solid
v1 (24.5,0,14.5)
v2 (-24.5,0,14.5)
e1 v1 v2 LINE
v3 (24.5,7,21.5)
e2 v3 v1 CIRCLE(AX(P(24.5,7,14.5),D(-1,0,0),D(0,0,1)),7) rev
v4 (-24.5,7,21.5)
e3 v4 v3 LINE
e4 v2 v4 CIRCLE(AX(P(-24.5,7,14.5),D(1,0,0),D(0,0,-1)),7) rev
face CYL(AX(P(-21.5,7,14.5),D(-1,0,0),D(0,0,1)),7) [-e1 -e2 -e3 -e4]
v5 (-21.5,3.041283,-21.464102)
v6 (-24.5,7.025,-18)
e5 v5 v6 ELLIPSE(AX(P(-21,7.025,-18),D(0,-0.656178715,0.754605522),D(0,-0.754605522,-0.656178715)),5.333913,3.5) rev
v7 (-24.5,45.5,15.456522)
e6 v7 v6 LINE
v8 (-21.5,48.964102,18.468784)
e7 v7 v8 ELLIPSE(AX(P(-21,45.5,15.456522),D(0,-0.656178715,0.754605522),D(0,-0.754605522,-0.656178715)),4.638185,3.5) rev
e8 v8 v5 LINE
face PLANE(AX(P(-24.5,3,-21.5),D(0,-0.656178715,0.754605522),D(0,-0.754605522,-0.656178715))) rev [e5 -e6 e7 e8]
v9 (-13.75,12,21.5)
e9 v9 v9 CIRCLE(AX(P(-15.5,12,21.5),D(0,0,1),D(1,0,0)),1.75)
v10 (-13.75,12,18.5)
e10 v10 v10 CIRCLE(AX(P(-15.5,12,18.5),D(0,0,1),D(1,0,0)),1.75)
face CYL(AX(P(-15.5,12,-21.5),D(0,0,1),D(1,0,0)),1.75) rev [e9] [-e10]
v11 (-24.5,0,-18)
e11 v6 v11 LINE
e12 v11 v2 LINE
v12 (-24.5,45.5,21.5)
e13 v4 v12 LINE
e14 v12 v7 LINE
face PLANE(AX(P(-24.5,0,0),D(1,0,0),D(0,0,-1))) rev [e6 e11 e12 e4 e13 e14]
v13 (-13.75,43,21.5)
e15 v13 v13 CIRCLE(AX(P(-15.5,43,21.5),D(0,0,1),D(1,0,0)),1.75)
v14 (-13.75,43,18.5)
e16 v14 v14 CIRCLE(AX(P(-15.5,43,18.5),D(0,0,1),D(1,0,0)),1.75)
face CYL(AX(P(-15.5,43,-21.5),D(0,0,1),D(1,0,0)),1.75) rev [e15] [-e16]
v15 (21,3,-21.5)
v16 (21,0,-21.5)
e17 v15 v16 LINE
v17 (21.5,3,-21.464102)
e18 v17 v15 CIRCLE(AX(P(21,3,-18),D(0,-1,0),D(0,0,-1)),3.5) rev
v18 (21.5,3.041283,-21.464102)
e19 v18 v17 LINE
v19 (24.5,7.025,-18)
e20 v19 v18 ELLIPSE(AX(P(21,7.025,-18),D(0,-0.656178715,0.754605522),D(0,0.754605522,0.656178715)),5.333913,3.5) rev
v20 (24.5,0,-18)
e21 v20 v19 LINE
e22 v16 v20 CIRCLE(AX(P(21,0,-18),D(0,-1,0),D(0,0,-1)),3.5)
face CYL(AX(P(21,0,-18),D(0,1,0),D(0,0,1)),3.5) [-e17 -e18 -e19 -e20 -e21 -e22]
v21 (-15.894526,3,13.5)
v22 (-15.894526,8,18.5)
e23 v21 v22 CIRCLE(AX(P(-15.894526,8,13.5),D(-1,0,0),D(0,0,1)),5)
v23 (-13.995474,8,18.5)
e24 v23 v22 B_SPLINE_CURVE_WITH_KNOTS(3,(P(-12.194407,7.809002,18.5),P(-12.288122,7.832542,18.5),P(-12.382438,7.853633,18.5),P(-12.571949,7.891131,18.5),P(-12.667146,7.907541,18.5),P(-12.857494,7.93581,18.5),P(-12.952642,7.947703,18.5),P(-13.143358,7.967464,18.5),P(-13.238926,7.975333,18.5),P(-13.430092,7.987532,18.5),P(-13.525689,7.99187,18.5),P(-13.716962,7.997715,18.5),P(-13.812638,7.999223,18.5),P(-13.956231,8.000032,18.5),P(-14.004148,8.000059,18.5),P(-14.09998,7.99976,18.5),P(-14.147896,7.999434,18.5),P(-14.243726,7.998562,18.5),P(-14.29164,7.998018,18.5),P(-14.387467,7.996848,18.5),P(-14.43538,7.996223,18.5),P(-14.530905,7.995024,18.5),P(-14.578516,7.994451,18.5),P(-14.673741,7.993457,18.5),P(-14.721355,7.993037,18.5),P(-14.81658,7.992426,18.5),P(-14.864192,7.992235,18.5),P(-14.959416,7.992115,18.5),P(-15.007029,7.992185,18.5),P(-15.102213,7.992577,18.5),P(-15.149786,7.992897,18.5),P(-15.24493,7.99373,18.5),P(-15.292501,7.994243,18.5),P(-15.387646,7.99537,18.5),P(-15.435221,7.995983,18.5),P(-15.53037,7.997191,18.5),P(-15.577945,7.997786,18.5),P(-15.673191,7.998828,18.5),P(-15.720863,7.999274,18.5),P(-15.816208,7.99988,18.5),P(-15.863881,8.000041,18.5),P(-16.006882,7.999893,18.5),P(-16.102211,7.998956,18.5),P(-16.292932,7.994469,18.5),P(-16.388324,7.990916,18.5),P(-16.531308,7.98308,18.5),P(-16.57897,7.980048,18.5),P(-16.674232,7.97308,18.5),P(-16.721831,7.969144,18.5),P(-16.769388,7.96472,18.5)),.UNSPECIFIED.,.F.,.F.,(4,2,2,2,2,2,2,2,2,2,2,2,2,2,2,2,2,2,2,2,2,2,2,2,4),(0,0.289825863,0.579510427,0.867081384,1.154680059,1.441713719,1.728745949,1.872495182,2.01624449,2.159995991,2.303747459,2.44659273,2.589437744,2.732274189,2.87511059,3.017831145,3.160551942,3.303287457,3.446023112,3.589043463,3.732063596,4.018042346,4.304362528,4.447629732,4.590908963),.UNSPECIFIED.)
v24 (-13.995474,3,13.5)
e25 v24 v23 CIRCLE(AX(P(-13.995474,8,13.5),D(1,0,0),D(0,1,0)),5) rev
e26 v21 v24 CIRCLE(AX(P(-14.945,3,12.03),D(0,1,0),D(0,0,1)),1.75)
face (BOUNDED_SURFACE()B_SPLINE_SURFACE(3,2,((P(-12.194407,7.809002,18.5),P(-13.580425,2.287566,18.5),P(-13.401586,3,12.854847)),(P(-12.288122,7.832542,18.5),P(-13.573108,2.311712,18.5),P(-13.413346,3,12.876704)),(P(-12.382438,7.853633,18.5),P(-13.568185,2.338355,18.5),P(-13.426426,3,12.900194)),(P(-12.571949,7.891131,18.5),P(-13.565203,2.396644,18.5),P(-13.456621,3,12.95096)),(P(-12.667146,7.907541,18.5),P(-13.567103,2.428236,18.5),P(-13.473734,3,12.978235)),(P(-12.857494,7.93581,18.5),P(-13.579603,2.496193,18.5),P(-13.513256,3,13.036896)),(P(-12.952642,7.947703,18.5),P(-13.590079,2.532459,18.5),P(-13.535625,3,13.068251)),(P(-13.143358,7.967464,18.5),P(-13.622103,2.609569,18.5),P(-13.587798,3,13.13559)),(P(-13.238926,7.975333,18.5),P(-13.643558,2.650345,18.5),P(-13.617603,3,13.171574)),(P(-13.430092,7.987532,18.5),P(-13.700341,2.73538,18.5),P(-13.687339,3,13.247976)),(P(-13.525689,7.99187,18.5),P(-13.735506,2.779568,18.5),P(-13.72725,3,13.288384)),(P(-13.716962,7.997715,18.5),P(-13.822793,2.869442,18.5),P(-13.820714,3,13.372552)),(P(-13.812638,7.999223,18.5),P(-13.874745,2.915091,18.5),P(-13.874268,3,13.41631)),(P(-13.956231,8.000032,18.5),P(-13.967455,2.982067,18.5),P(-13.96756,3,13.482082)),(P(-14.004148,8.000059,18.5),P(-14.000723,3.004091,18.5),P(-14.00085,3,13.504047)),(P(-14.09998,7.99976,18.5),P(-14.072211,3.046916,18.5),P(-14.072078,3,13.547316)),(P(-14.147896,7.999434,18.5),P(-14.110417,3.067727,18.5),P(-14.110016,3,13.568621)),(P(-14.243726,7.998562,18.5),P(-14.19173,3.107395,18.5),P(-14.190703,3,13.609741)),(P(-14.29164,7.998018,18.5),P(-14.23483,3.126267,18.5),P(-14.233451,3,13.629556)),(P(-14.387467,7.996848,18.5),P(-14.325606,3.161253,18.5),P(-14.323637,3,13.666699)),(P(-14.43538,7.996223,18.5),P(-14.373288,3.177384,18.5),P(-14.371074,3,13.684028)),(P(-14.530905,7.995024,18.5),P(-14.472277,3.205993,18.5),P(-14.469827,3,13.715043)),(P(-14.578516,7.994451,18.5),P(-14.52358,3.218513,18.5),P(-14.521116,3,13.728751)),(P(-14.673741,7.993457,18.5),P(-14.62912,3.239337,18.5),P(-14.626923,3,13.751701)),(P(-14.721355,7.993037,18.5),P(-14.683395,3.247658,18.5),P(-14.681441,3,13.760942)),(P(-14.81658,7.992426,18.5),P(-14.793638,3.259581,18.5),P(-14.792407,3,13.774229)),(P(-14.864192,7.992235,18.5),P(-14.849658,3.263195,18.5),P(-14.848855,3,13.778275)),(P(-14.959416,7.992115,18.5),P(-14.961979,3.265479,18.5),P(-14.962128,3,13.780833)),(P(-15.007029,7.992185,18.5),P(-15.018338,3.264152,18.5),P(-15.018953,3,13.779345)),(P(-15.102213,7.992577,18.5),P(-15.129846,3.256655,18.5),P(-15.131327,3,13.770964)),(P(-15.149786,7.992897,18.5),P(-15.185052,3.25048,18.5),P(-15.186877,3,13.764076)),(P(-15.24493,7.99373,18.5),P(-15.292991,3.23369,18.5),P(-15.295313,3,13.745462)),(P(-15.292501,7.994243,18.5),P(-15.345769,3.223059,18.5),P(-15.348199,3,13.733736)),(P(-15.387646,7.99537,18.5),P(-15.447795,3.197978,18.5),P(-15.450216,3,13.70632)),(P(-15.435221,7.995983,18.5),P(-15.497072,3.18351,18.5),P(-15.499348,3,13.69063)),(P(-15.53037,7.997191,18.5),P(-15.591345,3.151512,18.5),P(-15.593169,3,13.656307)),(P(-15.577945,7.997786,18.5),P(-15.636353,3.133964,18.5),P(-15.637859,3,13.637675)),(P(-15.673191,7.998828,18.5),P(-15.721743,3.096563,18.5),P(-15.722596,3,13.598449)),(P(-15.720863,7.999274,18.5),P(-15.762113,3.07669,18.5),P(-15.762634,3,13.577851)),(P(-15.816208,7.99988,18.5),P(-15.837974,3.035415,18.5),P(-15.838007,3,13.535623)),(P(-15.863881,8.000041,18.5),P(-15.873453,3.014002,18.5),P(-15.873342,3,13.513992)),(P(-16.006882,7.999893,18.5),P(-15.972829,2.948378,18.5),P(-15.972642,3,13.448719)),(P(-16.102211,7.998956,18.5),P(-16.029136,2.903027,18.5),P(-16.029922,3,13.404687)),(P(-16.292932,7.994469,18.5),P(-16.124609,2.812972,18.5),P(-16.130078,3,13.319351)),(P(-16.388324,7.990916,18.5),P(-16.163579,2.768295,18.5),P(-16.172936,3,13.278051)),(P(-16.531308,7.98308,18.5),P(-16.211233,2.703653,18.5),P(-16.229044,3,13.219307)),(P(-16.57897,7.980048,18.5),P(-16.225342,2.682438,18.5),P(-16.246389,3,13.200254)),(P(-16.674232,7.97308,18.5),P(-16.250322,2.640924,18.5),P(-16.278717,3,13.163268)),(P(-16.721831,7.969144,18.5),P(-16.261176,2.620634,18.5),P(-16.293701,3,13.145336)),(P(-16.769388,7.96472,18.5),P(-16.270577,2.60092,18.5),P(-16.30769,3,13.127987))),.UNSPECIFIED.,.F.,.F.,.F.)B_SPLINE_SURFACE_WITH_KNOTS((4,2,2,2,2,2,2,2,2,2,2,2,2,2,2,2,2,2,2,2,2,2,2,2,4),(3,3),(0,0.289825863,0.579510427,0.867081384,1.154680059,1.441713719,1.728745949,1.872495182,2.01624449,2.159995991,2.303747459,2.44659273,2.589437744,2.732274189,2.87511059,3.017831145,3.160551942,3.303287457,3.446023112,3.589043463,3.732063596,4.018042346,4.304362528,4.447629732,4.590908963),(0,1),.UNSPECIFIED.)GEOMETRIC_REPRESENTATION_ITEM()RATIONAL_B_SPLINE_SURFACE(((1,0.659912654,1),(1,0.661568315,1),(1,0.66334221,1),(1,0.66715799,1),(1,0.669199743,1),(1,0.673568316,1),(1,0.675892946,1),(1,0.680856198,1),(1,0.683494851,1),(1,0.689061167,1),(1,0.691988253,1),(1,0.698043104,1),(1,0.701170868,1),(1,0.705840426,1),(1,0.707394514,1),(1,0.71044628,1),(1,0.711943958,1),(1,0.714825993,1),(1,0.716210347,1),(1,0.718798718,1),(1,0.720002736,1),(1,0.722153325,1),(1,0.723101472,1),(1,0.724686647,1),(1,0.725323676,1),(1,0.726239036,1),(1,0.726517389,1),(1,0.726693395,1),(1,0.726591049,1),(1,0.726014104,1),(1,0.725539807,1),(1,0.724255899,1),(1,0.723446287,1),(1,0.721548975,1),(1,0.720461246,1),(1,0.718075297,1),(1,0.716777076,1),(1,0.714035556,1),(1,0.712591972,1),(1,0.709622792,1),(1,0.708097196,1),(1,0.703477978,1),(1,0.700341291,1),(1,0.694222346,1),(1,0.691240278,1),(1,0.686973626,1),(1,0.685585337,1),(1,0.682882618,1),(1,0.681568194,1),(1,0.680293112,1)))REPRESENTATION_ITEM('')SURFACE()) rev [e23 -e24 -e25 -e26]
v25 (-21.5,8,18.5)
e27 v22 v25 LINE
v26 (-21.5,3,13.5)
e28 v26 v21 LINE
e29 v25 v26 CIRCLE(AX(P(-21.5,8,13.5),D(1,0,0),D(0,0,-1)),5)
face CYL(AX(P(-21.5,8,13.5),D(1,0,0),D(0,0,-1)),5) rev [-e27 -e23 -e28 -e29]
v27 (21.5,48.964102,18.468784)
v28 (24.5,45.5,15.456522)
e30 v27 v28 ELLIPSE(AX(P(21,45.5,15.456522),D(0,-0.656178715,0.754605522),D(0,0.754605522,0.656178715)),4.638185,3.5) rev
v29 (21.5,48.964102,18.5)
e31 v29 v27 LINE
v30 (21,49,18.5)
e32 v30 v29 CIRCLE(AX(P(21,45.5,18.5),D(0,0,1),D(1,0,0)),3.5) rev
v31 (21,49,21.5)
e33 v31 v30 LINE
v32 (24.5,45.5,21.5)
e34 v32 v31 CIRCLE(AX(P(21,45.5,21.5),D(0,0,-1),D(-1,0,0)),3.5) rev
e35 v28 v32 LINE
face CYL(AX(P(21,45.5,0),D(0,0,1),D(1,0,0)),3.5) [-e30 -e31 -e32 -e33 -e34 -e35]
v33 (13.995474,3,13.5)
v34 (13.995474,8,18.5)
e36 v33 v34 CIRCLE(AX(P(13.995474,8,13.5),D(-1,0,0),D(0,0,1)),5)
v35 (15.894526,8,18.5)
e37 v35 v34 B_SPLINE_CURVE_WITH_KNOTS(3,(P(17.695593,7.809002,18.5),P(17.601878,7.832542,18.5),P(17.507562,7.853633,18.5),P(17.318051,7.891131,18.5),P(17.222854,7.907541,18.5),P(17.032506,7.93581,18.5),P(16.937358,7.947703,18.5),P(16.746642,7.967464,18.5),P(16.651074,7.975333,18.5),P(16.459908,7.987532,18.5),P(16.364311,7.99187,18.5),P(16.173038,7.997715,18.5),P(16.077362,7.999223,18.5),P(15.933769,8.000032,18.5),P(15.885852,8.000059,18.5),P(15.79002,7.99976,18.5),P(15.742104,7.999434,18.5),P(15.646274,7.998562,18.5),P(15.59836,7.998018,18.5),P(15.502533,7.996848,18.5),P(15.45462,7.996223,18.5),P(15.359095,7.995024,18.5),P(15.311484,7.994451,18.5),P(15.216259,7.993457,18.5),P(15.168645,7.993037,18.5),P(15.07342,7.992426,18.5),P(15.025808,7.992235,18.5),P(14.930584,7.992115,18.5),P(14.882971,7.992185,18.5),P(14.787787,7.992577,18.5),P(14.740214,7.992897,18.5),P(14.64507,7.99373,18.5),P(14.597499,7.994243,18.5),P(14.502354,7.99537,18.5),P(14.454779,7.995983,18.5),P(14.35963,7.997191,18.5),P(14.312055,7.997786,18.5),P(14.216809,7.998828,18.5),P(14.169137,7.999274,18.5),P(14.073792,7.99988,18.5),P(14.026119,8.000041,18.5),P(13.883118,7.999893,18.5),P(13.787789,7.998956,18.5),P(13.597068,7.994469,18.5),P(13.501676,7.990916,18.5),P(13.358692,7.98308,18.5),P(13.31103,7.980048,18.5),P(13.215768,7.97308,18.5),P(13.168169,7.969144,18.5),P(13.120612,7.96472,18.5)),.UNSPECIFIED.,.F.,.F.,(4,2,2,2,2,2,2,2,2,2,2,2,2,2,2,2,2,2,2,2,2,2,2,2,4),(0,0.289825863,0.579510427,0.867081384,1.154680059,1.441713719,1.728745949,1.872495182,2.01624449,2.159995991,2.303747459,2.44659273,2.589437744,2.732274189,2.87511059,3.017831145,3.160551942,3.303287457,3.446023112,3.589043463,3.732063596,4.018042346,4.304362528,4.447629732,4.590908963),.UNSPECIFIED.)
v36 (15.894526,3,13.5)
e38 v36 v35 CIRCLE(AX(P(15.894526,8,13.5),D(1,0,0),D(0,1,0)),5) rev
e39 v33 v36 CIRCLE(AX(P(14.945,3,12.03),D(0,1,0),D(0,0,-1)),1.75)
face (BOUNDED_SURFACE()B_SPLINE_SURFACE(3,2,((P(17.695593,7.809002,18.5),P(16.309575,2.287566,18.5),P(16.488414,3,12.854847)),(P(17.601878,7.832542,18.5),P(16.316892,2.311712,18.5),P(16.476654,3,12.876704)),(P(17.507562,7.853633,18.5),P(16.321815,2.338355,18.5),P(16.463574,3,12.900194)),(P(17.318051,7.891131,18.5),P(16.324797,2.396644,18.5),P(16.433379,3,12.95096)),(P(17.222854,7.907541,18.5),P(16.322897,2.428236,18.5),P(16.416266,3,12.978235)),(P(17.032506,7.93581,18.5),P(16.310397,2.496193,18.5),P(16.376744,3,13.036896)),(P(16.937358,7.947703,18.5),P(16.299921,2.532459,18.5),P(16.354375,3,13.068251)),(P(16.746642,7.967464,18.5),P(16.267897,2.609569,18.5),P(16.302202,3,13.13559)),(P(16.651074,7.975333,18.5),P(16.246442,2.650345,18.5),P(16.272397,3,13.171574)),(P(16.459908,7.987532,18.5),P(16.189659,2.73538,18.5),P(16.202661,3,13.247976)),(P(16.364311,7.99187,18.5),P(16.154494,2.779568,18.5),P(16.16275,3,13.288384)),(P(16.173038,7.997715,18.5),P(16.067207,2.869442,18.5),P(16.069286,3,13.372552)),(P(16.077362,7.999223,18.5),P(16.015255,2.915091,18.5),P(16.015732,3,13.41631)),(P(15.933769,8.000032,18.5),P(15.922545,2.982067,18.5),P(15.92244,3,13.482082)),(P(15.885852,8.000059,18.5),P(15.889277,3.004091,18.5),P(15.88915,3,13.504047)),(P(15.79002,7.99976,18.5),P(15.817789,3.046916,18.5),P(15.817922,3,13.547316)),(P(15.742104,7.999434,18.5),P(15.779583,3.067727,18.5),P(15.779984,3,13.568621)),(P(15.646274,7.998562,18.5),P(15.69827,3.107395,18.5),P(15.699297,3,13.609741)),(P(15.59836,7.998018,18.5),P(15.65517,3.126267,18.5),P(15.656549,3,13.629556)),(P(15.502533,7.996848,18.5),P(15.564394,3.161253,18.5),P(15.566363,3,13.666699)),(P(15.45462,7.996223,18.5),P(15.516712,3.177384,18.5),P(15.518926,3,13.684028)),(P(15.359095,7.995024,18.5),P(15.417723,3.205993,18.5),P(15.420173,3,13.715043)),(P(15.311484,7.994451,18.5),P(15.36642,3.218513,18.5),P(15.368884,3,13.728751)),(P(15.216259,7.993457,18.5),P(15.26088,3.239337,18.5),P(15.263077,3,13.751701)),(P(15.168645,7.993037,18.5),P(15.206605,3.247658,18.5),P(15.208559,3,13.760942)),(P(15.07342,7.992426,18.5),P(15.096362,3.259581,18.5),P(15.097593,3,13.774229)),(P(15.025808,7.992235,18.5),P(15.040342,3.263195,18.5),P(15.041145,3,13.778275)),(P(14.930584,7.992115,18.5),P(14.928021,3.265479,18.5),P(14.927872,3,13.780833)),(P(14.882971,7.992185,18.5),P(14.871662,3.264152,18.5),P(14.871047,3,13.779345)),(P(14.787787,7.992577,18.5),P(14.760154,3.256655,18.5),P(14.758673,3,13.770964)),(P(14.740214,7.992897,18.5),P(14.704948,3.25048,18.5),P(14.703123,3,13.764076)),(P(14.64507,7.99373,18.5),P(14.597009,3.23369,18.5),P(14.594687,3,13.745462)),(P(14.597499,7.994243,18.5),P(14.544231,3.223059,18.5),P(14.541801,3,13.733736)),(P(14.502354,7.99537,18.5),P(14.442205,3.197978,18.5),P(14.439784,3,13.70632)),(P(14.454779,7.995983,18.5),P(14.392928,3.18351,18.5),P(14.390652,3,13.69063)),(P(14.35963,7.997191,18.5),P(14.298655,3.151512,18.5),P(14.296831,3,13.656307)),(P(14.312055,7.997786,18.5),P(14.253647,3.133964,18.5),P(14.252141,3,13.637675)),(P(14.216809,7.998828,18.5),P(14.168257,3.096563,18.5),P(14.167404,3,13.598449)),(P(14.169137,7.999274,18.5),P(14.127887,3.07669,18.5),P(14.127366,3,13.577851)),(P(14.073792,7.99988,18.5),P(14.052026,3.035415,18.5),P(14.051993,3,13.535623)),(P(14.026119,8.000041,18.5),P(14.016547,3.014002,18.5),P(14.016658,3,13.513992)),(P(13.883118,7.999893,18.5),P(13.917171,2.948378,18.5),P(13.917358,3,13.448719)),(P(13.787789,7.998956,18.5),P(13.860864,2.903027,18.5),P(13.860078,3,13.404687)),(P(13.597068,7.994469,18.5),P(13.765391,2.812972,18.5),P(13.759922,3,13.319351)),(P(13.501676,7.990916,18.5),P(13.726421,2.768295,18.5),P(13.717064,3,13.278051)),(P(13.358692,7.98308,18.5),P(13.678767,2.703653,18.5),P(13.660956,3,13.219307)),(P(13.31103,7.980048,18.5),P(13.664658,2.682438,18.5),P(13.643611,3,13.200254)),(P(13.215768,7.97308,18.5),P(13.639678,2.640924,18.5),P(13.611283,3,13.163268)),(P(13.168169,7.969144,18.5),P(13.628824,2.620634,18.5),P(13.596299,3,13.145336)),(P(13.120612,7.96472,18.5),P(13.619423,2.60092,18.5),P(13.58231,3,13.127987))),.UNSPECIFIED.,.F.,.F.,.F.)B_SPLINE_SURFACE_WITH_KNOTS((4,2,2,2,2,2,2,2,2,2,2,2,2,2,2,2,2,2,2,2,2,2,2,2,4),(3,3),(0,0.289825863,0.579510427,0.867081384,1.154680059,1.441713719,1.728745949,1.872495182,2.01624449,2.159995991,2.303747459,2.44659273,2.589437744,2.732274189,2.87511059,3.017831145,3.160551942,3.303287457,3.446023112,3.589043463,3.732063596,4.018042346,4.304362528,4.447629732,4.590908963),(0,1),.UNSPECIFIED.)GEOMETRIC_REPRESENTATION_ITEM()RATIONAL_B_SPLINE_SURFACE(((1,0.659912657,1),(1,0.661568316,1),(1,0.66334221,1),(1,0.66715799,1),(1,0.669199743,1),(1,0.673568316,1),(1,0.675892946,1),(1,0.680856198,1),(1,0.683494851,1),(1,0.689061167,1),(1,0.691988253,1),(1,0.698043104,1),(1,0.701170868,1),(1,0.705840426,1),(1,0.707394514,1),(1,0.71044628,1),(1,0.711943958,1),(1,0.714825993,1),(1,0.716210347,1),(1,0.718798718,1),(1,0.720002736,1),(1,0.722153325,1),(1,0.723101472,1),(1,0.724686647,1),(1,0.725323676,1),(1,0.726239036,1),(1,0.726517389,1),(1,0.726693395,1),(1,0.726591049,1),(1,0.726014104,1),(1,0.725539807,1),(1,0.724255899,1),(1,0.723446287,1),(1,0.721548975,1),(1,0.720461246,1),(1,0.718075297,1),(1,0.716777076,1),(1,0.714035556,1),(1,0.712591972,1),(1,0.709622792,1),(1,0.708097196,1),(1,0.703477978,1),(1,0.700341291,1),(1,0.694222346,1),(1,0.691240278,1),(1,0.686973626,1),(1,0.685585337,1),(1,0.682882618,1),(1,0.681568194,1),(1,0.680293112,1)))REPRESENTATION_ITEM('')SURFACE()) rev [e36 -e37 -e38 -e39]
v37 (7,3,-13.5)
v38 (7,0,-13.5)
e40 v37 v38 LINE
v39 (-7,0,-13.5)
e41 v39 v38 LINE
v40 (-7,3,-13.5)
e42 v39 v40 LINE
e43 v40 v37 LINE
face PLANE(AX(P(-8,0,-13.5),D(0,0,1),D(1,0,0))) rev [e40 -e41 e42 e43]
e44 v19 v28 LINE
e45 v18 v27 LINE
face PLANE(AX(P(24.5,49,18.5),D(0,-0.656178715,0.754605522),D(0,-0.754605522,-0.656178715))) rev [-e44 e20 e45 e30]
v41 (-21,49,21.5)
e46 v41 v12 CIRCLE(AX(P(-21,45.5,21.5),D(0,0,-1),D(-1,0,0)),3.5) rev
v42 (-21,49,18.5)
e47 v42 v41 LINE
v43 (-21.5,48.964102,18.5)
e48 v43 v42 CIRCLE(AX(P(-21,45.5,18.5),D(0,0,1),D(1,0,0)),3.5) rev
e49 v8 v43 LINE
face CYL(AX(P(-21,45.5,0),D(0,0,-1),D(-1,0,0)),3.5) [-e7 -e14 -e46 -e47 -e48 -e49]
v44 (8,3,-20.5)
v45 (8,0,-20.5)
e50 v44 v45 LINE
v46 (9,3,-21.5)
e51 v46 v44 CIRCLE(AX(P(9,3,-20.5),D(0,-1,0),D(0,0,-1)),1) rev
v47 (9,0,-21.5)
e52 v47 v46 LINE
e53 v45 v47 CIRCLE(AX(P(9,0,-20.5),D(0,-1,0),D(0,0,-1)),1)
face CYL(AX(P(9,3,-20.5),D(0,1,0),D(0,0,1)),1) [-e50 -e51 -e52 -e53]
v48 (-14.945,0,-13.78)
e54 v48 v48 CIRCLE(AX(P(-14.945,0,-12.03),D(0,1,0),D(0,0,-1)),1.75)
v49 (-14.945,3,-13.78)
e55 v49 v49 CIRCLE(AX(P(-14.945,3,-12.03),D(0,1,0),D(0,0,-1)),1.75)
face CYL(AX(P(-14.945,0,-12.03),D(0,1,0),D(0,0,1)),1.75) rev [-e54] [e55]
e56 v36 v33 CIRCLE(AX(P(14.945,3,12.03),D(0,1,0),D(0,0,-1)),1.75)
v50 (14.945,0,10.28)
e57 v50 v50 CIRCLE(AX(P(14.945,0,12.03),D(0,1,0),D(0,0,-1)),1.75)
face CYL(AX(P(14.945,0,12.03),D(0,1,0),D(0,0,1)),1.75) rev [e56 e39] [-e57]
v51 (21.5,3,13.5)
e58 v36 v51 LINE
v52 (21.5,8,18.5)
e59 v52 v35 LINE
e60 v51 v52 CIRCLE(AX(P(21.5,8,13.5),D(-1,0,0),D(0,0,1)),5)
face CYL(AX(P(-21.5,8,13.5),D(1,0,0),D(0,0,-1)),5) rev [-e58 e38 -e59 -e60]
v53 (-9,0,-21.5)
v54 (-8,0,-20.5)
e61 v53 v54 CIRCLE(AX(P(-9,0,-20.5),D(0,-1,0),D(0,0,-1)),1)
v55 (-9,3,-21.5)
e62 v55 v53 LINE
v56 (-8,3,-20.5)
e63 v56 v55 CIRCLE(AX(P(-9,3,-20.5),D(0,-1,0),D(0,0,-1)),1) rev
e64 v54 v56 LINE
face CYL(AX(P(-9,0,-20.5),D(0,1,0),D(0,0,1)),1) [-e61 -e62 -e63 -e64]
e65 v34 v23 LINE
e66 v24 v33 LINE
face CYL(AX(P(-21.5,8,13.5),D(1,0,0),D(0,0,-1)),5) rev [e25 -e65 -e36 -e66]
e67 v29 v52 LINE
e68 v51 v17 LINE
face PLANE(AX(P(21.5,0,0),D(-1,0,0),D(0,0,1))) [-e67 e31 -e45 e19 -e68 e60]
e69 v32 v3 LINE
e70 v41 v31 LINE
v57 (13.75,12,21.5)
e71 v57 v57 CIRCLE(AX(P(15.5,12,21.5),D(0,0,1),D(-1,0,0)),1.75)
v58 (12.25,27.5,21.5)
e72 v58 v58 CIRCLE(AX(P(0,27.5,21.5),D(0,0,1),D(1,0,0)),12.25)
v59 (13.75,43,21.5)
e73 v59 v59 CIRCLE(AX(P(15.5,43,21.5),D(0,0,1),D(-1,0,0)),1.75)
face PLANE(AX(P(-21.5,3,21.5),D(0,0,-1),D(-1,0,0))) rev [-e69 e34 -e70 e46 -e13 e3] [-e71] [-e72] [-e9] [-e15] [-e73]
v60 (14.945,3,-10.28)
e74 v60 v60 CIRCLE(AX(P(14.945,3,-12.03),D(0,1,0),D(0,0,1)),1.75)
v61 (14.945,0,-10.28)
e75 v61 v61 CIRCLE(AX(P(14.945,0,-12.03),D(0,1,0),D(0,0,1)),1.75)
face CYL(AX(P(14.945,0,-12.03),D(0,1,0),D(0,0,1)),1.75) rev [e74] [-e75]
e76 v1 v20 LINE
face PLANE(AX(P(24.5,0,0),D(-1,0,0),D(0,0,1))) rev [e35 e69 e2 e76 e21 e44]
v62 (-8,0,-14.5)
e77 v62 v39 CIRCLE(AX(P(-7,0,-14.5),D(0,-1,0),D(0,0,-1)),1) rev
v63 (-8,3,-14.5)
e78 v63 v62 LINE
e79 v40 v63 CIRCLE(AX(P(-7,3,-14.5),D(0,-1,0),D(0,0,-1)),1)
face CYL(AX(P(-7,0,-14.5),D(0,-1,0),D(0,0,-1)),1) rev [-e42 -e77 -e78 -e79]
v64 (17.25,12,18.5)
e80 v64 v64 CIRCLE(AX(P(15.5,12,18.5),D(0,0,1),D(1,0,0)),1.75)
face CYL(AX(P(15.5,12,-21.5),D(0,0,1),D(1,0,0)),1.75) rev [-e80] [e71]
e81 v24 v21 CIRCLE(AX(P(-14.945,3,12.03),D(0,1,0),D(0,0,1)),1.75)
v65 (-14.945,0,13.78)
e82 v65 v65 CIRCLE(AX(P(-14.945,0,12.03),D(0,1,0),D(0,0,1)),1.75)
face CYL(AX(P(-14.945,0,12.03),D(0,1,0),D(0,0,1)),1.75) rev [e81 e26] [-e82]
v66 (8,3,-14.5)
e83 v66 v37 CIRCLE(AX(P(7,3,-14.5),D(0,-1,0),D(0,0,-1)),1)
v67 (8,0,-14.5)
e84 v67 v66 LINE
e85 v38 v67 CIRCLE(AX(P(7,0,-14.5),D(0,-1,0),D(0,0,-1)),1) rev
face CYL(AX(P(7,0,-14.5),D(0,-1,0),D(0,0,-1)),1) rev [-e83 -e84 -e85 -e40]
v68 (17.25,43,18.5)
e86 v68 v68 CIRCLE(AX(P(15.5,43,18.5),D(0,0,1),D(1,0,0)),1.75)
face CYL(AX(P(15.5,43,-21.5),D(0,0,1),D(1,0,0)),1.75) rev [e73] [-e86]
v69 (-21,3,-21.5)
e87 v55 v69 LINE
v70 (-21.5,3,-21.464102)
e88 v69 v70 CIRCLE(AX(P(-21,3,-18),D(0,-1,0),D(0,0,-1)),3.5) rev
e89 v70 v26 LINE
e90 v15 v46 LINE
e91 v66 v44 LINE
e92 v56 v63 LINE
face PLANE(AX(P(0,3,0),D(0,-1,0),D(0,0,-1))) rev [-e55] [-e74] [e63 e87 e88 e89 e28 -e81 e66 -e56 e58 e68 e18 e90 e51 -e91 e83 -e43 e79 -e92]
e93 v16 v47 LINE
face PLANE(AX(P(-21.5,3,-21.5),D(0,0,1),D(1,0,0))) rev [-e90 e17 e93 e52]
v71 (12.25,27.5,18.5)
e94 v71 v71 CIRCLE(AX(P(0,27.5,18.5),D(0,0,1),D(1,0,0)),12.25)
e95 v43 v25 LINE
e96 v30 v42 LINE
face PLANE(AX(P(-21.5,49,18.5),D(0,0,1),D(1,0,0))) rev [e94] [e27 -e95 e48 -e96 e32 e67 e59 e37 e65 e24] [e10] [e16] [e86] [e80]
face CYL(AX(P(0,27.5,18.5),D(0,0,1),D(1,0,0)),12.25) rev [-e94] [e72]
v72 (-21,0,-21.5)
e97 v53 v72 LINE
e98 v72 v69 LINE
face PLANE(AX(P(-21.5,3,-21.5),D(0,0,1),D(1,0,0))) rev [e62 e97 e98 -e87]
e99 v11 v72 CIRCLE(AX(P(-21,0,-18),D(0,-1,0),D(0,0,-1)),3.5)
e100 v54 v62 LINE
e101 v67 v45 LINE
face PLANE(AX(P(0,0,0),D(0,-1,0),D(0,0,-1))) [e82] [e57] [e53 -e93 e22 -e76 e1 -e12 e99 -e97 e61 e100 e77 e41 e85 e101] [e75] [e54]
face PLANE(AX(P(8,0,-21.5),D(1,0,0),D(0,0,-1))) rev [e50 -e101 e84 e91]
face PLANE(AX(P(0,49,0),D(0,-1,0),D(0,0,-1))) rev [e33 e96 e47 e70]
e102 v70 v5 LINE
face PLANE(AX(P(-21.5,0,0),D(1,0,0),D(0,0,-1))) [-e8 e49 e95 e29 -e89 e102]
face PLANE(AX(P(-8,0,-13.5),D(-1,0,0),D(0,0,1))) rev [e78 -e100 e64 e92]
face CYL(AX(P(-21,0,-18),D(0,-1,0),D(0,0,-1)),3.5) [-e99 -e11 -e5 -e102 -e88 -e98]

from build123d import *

# Parameters (mm, degrees)
ESBO_O1_W                = 43
ESBO_O1_H                = 43
RESSALTO_EXTRUS_O1_DEPTH = 3
ESBO_O2_W                = 43
ESBO_O2_H                = 3
RESSALTO_EXTRUS_O2_DEPTH = 46
ESBO_O3_R                = 1.75
CORTE_EXTRUS_O1_DEPTH    = 56.140729048
ESBO_O4_R                = 1.75
CORTE_EXTRUS_O2_DEPTH    = 69.645830172
RESSALTO_EXTRUS_O3_DEPTH = 3
RESSALTO_EXTRUS_O4_DEPTH = 3
ESBO_O7_R                = 12.25
CORTE_EXTRUS_O3_DEPTH    = 3
FILETE1_R                = 3.5
FILETE2_R                = 7
FILETE3_R                = 3.5
FILETE4_R                = 5
ESBO_O8_W                = 16
ESBO_O8_H                = 8
CORTE_EXTRUS_O4_DEPTH    = 57.378187353
FILETE5_R                = 1


with BuildPart() as part:
    # Esboço1 → Ressalto-extrusão1 (new body)
    with BuildSketch(Plane(origin=(0, 0, 0), x_dir=(1, 0, 0), z_dir=(0, 1, 0))):
        Rectangle(ESBO_O1_W, ESBO_O1_H)
    extrude(amount=RESSALTO_EXTRUS_O1_DEPTH)

    # Esboço2 → Ressalto-extrusão2 (add)
    with BuildSketch(Plane(origin=(0, 3, 0), x_dir=(1, 0, 0), z_dir=(0, 1, 0))):
        with Locations((0, -20)):
            Rectangle(ESBO_O2_W, ESBO_O2_H)
    extrude(amount=RESSALTO_EXTRUS_O2_DEPTH)

    # Esboço3 → Corte-extrusão1 (cut, through all)
    with BuildSketch(Plane(origin=(0, 3, 0), x_dir=(1, 0, 0), z_dir=(0, 1, 0))):
        with Locations(Location((14.945, 12.03, 0), (0, 0, 270))):
            Circle(ESBO_O3_R)
        with Locations(Location((14.945, -12.03, 0), (0, 0, 90))):
            Circle(ESBO_O3_R)
        with Locations(Location((-14.945, -12.03, 0), (0, 0, 270))):
            Circle(ESBO_O3_R)
        with Locations(Location((-14.945, 12.03, 0), (0, 0, 90))):
            Circle(ESBO_O3_R)
    extrude(amount=-CORTE_EXTRUS_O1_DEPTH, mode=Mode.SUBTRACT)

    # Esboço4 → Corte-extrusão2 (cut, through all)
    with BuildSketch(Plane.XY.offset(21.5)):
        with Locations((-15.5, 43)):
            Circle(ESBO_O4_R)
        with Locations((15.5, 43)):
            Circle(ESBO_O4_R)
        with Locations((-15.5, 12)):
            Circle(ESBO_O4_R)
        with Locations((15.5, 12)):
            Circle(ESBO_O4_R)
    extrude(amount=-CORTE_EXTRUS_O2_DEPTH, mode=Mode.SUBTRACT)

    # Esboço5 → Ressalto-extrusão3 (add)
    with BuildSketch(Plane.ZY.offset(21.5)):
        Polygon((-21.5, 0), (-21.5, 3), (18.5, 49), (21.5, 49), (21.5, 0), align=None)
    extrude(amount=RESSALTO_EXTRUS_O3_DEPTH)

    # Esboço6 → Ressalto-extrusão4 (add)
    with BuildSketch(Plane(origin=(21.5, 0, 0), x_dir=(0, 0, -1), z_dir=(1, 0, 0))):
        Polygon((21.5, 0), (-21.5, 0), (-21.5, 49), (-18.5, 49), (21.5, 3), align=None)
    extrude(amount=RESSALTO_EXTRUS_O4_DEPTH)

    # Esboço7 → Corte-extrusão3 (cut)
    with BuildSketch(Plane.XY.offset(21.5)):
        with Locations((0, 27.5)):
            Circle(ESBO_O7_R)
    extrude(amount=-CORTE_EXTRUS_O3_DEPTH, mode=Mode.SUBTRACT)

    # Filete1
    # the kernel refuses this fillet: 3.5 mm, written as the material it takes off along each edge
    with BuildSketch(Plane(origin=(-24.5, 49, 9.75), x_dir=(1, 0, 0), z_dir=(0, 0, 1)), Plane(origin=(24.5, 49, 30.25), x_dir=(-1, 0, 0), z_dir=(0, 0, -1))) as filete1_piece_1:
        with BuildLine():
            CenterArc((FILETE1_R, -FILETE1_R), FILETE1_R, 90, 90)
            Line((0, -FILETE1_R), (0, 0))
            Line((0, 0), (FILETE1_R, 0))
        make_face()
    extrude(amount=20.5, mode=Mode.SUBTRACT)

    # Filete2
    filete2_edges = [part.edges().sort_by_distance(p)[0] for p in [
        (0, 0, 21.5),
    ]]
    fillet(filete2_edges, radius=FILETE2_R)

    # Filete3
    # the kernel refuses this fillet: 3.5 mm, written as the material it takes off along each edge
    with BuildSketch(Plane(origin=(-24.5, -8.75, -21.5), x_dir=(0, 0, 1), z_dir=(0, 1, 0)), Plane(origin=(24.5, 11.75, -21.5), x_dir=(0, 0, 1), z_dir=(0, -1, 0))) as filete3_piece_1:
        with BuildLine():
            CenterArc((FILETE3_R, FILETE3_R), FILETE3_R, 180, 90)
            Line((0, FILETE3_R), (0, 0))
            Line((0, 0), (FILETE3_R, 0))
        make_face()
    extrude(amount=20.5, mode=Mode.SUBTRACT)

    # Filete4
    filete4_edges = [part.edges().sort_by_distance(p)[0] for p in [
        (0, 3, 18.5),
    ]]
    fillet(filete4_edges, radius=FILETE4_R)

    # Esboço8 → Corte-extrusão4 (cut, through all)
    with BuildSketch(Plane(origin=(0, 3, 0), x_dir=(1, 0, 0), z_dir=(0, 1, 0))):
        with Locations((0, 17.5)):
            Rectangle(ESBO_O8_W, ESBO_O8_H)
    extrude(amount=-CORTE_EXTRUS_O4_DEPTH, mode=Mode.SUBTRACT)

    # Filete5
    filete5_edges = [part.edges().sort_by_distance(p)[0] for p in [
        (-8, 1.5, -21.5),
        (8, 1.5, -21.5),
        (8, 1.5, -13.5),
        (-8, 1.5, -13.5),
    ]]
    fillet(filete5_edges, radius=FILETE5_R)


solid = part.part
